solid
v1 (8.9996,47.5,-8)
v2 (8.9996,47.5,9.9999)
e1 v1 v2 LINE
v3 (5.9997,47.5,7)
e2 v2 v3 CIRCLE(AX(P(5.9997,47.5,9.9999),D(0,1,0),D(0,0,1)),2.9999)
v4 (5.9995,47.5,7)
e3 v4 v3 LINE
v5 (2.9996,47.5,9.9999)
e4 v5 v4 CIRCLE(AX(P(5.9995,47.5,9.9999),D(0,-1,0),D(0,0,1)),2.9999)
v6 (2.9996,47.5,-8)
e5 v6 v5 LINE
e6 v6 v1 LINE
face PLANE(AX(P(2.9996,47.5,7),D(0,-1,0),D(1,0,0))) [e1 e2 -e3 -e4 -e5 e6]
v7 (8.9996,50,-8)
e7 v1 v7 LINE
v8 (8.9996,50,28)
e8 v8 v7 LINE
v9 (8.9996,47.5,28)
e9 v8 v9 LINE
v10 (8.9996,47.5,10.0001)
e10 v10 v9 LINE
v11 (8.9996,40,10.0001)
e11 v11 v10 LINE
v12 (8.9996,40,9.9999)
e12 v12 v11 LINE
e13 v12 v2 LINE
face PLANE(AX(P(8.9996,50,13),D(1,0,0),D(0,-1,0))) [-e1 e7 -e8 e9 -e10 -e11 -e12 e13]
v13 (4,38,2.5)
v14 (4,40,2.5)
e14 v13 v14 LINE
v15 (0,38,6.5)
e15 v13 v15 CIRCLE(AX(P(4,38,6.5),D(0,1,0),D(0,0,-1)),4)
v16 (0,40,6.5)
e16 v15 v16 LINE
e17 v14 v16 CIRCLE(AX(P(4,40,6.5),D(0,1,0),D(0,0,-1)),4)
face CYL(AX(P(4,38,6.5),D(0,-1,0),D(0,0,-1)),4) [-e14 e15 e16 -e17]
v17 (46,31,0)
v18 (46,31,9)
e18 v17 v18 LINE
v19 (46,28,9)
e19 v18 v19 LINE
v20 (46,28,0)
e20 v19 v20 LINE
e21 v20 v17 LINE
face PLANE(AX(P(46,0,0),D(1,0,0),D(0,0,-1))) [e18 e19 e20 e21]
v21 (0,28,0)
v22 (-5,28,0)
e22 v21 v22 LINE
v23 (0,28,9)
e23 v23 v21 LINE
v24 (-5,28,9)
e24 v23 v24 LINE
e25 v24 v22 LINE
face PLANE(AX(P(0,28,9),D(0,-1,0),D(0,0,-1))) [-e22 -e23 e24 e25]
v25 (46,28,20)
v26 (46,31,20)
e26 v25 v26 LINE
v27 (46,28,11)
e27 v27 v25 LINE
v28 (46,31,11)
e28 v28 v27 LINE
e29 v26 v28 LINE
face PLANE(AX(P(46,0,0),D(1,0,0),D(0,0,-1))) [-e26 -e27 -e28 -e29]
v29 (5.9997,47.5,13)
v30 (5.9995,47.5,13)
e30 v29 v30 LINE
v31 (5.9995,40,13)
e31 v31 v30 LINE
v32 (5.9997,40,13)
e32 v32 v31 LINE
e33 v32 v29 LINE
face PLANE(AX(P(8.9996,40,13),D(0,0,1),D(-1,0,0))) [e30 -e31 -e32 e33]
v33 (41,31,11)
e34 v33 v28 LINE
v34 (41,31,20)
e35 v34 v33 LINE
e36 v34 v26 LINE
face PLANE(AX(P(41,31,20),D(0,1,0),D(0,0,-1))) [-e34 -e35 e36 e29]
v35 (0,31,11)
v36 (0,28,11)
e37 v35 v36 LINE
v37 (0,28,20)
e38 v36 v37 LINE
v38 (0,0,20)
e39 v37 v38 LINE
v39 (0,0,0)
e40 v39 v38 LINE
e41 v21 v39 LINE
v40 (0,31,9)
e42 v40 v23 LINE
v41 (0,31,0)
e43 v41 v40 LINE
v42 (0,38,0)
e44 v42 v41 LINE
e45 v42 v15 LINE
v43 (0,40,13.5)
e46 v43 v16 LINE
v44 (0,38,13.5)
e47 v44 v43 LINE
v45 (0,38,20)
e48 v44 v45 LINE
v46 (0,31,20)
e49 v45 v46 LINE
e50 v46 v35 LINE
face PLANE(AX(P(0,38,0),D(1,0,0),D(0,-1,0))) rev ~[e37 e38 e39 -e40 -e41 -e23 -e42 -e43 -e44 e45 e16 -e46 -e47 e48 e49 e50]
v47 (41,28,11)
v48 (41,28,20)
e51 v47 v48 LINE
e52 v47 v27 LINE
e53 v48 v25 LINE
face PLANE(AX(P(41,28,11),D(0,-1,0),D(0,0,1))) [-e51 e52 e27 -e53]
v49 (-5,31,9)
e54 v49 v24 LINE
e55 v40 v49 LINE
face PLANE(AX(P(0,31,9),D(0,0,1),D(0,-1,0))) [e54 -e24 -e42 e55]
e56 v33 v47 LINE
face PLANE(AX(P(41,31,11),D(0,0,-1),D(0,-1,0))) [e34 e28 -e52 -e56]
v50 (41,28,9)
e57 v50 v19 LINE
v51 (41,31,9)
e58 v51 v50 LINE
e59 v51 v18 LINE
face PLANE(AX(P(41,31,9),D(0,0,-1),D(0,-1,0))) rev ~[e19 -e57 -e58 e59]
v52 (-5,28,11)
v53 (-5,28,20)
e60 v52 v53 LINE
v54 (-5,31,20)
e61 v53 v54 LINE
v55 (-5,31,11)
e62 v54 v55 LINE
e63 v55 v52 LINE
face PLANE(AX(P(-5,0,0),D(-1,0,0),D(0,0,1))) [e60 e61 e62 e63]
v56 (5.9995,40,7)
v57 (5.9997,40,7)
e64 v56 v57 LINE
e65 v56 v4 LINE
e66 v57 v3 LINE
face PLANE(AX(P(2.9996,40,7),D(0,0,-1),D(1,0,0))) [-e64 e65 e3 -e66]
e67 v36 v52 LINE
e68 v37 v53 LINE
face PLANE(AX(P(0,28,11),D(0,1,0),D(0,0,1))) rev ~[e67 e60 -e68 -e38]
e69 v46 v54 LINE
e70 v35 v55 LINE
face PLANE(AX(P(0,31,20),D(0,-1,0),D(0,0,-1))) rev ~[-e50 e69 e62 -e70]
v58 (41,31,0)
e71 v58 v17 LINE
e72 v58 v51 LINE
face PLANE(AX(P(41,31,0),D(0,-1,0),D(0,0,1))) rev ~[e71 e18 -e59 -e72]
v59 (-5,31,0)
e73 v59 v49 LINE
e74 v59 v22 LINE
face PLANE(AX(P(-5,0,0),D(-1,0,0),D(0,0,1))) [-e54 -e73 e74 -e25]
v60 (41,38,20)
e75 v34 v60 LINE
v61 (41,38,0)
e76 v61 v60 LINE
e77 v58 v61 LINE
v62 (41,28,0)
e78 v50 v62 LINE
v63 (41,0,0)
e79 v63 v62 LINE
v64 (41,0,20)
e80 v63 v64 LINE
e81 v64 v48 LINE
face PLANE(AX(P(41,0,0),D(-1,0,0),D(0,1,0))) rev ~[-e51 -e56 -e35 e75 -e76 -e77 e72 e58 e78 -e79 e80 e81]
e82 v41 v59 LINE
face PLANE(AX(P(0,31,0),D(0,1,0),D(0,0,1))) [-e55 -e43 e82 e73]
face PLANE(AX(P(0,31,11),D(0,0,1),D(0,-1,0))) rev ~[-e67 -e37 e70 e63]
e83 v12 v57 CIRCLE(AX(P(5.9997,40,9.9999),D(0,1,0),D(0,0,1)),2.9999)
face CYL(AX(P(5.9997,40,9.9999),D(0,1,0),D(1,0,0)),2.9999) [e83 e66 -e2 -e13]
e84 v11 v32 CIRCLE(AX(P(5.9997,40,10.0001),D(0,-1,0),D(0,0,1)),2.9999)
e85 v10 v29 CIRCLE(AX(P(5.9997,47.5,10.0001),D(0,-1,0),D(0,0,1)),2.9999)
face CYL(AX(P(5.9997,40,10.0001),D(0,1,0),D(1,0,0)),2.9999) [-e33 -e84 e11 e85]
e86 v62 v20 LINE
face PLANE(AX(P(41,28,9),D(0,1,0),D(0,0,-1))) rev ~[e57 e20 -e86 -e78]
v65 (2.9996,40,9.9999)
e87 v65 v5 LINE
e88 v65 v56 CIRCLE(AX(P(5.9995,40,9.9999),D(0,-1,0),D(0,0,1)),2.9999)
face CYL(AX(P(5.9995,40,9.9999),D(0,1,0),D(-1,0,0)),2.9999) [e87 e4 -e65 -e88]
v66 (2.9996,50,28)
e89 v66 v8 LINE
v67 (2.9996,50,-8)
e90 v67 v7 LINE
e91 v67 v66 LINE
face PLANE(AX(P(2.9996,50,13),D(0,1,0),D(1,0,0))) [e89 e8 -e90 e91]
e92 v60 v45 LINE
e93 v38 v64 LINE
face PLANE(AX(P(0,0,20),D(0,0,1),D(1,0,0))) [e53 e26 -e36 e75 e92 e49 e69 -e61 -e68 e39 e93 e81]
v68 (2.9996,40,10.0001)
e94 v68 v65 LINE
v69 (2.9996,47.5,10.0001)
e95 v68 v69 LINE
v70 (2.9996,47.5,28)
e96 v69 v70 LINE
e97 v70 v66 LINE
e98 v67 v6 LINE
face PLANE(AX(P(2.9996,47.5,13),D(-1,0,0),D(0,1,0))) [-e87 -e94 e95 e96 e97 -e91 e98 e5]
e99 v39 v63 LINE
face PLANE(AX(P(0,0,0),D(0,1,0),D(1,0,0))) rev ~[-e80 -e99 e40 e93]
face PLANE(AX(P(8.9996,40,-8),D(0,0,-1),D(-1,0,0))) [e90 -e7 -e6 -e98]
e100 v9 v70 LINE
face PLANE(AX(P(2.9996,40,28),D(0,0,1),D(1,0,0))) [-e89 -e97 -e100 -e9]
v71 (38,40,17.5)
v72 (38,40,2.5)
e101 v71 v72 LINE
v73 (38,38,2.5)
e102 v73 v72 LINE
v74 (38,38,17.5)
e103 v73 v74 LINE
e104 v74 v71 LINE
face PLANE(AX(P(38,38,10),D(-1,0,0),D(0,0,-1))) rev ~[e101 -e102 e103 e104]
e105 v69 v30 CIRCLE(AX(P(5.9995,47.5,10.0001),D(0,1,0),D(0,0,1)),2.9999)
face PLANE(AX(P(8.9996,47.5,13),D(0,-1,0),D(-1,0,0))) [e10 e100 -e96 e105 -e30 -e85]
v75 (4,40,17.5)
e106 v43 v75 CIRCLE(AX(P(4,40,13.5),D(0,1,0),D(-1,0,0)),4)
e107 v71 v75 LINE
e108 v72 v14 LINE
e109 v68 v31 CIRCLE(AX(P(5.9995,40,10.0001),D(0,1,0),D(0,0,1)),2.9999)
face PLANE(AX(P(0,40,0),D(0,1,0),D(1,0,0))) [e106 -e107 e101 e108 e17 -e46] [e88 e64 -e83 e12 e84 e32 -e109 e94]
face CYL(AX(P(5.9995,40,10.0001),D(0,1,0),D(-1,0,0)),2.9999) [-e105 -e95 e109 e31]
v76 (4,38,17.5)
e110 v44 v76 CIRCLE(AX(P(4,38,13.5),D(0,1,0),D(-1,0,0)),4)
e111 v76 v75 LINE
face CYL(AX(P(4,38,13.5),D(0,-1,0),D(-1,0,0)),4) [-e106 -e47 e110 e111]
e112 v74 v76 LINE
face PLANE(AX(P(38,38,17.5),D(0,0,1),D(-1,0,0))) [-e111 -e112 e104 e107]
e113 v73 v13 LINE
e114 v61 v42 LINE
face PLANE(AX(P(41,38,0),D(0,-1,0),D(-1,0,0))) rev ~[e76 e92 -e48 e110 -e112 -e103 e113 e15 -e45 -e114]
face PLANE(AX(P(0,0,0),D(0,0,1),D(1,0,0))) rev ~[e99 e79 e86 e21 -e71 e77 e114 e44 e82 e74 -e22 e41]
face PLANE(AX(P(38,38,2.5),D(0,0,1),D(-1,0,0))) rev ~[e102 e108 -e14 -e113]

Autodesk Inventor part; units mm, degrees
ref_plane "YZ Plane" through (0, 0, 0) normal (1, 0, 0) x (0, 1, 0)
ref_plane "XZ Plane" through (0, 0, 0) normal (0, 1, 0) x (-1, 0, 0)
ref_plane "XY Plane" through (0, 0, 0) normal (0, 0, 1) x (1, 0, 0)
sketch "Esquisse1" plane through (0, 0, 0) normal (0, 0, 1) x (1, 0, 0)
  line L0 (0, 0) -> (41, 0)
  line L1 (41, 0) -> (41, 38)
  line L2 (41, 38) -> (0, 38)
  line L3 (0, 38) -> (0, 0)
  dimension "d0" = 41
  dimension "d1" = 38
extrude "Extrusion1" add sketch "Esquisse1" along normal blind 20
sketch "Esquisse2" plane through (0, 38, 0) normal (0, 1, 0) x (1, 0, 0)
  line L0 (0, 0) -> (0, -20) projected
  line L1 (0, -10) -> (0, -15)
  line L2 (0, -15) -> (0, -6.5)
  line L3 (0, -10) -> (38, -10)
  line L4 (38, -10) -> (38, -2.5)
  line L5 (38, -2.5) -> (4, -2.5)
  line L6 (0, -2.5) -> (0, -10)
  line L7 (38, -10) -> (38, -17.5)
  line L8 (38, -17.5) -> (4, -17.5)
  line L9 (0, -13.5) -> (0, -10)
  arc A0 (0, -13.5) -> (4, -17.5) centre (4, -13.5) ccw
  arc A1 (4, -2.5) -> (0, -6.5) centre (4, -6.5) ccw
  point P0 (0, -5)
  point P1 (0, -17.5)
  point P2 (0, -2.5)
  point P3 (0, -17.5)
  point P4 (0, -13.5)
  dimension "d6" = 38
  dimension "d9" = 15
  dimension "d10" = 4
  dimension "d11" = 4
extrude "Extrusion2" add sketch "Esquisse2" along normal blind 2
sketch "Esquisse3" plane through (0, 40, 0) normal (0, 1, 0) x (1, 0, 0)
  line L0 (4, -17.5) -> (38, -17.5) projected
  line L1 (0, -6.5) -> (0, -13.5) projected
  line L2 (2.9996, -7) -> (8.9996, -7)
  line L3 (8.9996, -7) -> (8.9996, -13)
  line L4 (8.9996, -13) -> (2.9996, -13)
  line L5 (2.9996, -13) -> (2.9996, -7)
  line L6 (2.9996, -7) -> (8.9996, -13) construction
  line L7 (8.9996, -7) -> (2.9996, -13) construction
  point P0 (0, 0)
  point P1 (5.9996, -10)
  dimension "d12" = 7.5
  dimension "d13" = 5.9996
  dimension "d14" = 6
  dimension "d15" = 6
extrude "Extrusion3" add sketch "Esquisse3" along normal blind 10
sketch "Esquisse4" plane through (8.9996, 40, 7) normal (0, 0, -1) x (-1, 0, 0)
  line L0 (6, 10) -> (0, 10) projected
  line L1 (0, 10) -> (6, 10)
  line L2 (6, 10) -> (6, 7.5)
  line L3 (6, 7.5) -> (0, 7.5)
  line L4 (0, 7.5) -> (0, 10)
  point P0 (8.9996, -40)
  dimension "d18" = 6
  dimension "d19" = 2.5
extrude "Extrusion4" add sketch "Esquisse4" along normal blind 15
sketch "Esquisse6" plane through (2.9996, 40, 13) normal (0, 0, 1) x (1, 0, 0)
  line L0 (0, 10) -> (6, 10) projected
  line L1 (0, 10) -> (6, 10)
  line L2 (6, 10) -> (6, 7.5)
  line L3 (6, 7.5) -> (0, 7.5)
  line L4 (0, 7.5) -> (0, 10)
  point P0 (-2.9996, -40)
  dimension "d22" = 6
  dimension "d23" = 2.5
extrude "Extrusion5" add sketch "Esquisse6" along normal blind 15
fillet "Congé1" radius 3 4 edges at (2.9996, 43.75, 7) (2.9996, 43.75, 13) (8.9996, 43.75, 13) (8.9996, 43.75, 7)
sketch "Esquisse9" plane through (41, 0, 0) normal (1, 0, 0) x (0, 0, -1)
  line L0 (-20, 0) -> (-20, 38) projected
  line L1 (-20, 38) -> (-20, 31)
  line L2 (-20, 31) -> (-11, 31)
  line L3 (-11, 31) -> (-11, 28)
  line L4 (-11, 28) -> (-20, 28)
  line L5 (-20, 28) -> (-20, 31)
  line L6 (-11, 31) -> (-10, 31)
  line L7 (0, 31) -> (-9, 31)
  line L8 (-9, 31) -> (-9, 28)
  line L9 (-9, 28) -> (0, 28)
  line L10 (0, 28) -> (0, 31)
  point P0 (0, 0)
  dimension "d38" = 7
  dimension "d39" = 9
  dimension "d40" = 3
  dimension "d41" = 1
extrude "Extrusion9" add sketch "Esquisse9" along normal blind 5
sketch "Esquisse10" plane through (0, 0, 0) normal (-1, 0, 0) x (0, 0, 1)
  line L0 (0, 38) -> (0, 31)
  line L1 (0, 38) -> (0, 0) projected
  line L2 (0, 31) -> (9, 31)
  line L3 (9, 31) -> (9, 28)
  line L4 (9, 28) -> (0, 28)
  line L5 (0, 28) -> (0, 31)
  line L6 (9, 31) -> (10, 31)
  line L7 (10, 31) -> (10, 24.8436)
  line L8 (20, 31) -> (11, 31)
  line L9 (11, 31) -> (11, 28)
  line L10 (11, 28) -> (20, 28)
  line L11 (20, 28) -> (20, 31)
  dimension "d44" = 7
  dimension "d45" = 9
  dimension "d46" = 3
  dimension "d47" = 1
extrude "Extrusion10" add sketch "Esquisse10" along normal blind 5
properties part number "Servomoteur analogique FS5106B"
